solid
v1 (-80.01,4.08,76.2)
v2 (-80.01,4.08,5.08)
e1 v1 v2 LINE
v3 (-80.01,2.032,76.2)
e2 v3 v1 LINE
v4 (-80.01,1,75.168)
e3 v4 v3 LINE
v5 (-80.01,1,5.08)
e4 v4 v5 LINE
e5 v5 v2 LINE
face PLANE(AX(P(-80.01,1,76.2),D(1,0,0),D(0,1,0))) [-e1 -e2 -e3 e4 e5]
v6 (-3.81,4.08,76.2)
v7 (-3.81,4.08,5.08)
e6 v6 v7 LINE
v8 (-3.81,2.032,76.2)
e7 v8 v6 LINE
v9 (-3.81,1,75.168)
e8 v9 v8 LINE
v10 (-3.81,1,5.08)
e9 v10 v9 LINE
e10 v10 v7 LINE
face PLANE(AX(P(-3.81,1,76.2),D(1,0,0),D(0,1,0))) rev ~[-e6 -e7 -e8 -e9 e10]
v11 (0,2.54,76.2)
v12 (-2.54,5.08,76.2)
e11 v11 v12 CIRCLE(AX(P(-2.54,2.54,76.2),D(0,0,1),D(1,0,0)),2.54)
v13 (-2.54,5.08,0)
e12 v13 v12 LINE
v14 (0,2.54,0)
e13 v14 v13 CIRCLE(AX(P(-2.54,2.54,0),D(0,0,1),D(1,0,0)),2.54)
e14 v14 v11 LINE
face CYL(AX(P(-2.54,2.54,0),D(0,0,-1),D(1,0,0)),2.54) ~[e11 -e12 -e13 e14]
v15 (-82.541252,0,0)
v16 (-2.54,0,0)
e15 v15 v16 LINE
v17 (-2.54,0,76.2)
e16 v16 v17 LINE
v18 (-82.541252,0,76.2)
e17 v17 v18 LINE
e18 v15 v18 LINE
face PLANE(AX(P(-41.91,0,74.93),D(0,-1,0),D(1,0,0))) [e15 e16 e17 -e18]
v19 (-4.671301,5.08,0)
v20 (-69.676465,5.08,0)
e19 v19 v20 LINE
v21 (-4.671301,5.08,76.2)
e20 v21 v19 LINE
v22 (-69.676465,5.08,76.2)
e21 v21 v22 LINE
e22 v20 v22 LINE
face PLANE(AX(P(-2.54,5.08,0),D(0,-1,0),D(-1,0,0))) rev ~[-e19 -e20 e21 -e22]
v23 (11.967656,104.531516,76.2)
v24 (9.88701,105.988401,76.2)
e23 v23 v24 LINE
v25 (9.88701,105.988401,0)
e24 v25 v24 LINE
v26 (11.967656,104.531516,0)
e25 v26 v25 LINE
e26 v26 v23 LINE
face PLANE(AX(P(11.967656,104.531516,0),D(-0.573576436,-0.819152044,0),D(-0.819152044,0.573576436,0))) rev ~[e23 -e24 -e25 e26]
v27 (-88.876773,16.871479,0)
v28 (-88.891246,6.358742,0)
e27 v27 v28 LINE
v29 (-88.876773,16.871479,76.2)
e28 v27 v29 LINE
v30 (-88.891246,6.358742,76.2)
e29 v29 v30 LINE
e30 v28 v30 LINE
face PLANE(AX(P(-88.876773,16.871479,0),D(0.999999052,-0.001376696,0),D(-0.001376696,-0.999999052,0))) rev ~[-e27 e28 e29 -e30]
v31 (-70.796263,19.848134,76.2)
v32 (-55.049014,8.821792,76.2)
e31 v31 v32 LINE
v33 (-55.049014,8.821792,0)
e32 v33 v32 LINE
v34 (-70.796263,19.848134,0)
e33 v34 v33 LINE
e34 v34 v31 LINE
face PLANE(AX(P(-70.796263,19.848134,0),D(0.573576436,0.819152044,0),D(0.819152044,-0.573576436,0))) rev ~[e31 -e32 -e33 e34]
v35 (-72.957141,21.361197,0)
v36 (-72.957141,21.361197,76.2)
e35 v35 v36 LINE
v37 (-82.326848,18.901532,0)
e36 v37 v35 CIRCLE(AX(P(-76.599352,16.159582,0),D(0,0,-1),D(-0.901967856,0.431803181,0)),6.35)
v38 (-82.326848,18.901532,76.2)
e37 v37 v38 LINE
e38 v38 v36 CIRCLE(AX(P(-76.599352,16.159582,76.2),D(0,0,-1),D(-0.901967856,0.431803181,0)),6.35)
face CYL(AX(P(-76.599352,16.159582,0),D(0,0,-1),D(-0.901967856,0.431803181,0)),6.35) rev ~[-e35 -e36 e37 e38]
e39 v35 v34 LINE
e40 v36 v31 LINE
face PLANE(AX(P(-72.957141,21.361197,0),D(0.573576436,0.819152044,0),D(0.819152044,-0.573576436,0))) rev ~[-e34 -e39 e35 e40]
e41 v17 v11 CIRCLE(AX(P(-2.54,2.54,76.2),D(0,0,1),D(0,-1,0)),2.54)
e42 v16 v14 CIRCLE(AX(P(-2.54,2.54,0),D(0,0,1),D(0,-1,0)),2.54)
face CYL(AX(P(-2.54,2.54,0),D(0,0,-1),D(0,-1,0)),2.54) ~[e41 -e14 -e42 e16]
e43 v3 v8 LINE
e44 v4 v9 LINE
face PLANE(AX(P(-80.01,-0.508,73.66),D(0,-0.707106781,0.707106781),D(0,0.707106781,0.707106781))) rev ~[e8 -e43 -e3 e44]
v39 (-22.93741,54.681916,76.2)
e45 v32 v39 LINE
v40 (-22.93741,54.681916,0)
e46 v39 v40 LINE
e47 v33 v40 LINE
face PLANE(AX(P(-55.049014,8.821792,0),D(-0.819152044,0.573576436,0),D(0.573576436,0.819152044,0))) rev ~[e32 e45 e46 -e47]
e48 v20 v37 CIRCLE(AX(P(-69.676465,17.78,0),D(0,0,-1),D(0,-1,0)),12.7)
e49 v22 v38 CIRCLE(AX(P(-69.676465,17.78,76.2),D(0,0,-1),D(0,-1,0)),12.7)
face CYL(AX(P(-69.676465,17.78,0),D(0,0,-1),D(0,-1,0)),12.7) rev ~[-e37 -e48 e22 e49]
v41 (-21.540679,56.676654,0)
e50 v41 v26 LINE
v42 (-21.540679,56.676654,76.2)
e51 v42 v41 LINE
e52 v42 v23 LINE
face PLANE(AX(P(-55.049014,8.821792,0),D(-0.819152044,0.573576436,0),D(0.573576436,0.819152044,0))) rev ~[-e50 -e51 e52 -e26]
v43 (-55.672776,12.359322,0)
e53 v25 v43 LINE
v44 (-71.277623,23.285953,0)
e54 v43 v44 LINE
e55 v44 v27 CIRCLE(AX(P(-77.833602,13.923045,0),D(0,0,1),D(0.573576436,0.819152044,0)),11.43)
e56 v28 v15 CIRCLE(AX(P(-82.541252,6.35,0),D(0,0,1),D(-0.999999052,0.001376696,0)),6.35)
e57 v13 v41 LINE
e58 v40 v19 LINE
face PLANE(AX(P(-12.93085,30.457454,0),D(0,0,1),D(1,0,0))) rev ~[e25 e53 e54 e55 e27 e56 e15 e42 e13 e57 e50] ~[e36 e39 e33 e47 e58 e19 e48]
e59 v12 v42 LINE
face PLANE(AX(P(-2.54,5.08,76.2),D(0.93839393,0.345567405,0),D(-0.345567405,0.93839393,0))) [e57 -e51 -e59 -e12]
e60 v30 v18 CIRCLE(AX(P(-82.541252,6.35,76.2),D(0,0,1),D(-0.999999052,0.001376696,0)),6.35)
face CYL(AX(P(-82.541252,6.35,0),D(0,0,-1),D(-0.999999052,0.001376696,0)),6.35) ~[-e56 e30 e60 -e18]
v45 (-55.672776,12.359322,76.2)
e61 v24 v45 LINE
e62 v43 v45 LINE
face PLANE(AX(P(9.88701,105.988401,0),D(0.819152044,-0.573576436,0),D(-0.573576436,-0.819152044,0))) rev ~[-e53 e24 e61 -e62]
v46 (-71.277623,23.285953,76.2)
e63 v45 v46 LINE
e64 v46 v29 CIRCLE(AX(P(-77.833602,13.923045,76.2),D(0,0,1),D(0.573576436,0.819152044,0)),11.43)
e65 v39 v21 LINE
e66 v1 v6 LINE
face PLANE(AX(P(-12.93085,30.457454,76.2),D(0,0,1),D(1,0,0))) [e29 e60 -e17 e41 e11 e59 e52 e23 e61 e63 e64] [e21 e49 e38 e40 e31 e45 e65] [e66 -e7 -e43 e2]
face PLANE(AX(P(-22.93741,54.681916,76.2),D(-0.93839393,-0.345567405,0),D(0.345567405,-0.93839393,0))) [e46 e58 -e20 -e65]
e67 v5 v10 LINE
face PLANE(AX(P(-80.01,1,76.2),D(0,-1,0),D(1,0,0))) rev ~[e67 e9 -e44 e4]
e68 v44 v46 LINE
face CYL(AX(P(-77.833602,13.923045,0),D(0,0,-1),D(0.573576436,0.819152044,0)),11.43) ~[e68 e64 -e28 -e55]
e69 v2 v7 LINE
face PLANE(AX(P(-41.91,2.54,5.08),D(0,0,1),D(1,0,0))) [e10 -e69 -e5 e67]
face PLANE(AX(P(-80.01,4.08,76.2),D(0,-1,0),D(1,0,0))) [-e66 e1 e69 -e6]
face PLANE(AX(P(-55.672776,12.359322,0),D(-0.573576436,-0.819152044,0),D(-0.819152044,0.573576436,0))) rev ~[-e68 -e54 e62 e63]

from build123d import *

# Parameters (mm, degrees)
F1_DEPTH    = 76.2
F2_W        = 76.2
F2_H        = 3.08
F3_DEPTH    = 71.12
F4_W        = 76.2
F4_H        = 2.54
F5_DEPTH    = 2.032
F6_T4_DEPTH = 76.2
F8_DEPTH    = 76.2


# Not quite as in the source:
# - a fillet or chamfer that OpenCascade refuses, or shapes differently, is made with other operations: its cross-section is extruded or revolved along the edge and cut away or added


with BuildPart() as f1:
    # F0 (on Top) → F1 (new body)
    with BuildSketch(Plane.XY):
        with BuildLine():
            Line((-71.12, 0), (-2.54, 0))
            ThreePointArc((-2.54, 0), (-0.7439487758, 0.7439487758), (0, 2.54))
            ThreePointArc((0, 2.54), (-0.7439487758, 4.3360512242), (-2.54, 5.08))
            Line((-2.54, 5.08), (-69.676465438, 5.08))
            ThreePointArc((-69.676465438, 5.08), (-79.0448551931, 9.2054286756), (-82.3268475088, 18.9015317486))
            ThreePointArc((-82.3268475088, 18.9015317486), (-78.2116767293, 22.3014792843), (-72.9571412523, 21.3611970334))
            Line((-72.9571412523, 21.3611970334), (-70.7962627974, 19.8481336501))
            Line((-70.7962627974, 19.8481336501), (-55.0490144099, 8.8217916231))
            Line((-55.0490144099, 8.8217916231), (11.9676564134, 104.5315164778))
            Line((11.9676564134, 104.5315164778), (9.8870102209, 105.9884006261))
            Line((9.8870102209, 105.9884006261), (-55.672776454, 12.3593219639))
            Line((-55.672776454, 12.3593219639), (-71.2776228977, 23.2859530764))
            ThreePointArc((-71.2776228977, 23.2859530764), (-81.747690686, 24.661984001), (-88.8767730732, 16.871479209))
            Line((-88.8767730732, 16.871479209), (-88.8912459344, 6.3587420222))
            ThreePointArc((-88.8912459344, 6.3587420222), (-87.0344697211, 1.8629637755), (-82.541251952, 0))
            Line((-82.541251952, 0), (-71.12, 0))
        make_face()
    extrude(amount=F1_DEPTH)

    # F2 (on face) → F3 (cut)
    with BuildSketch(Plane.XY.offset(76.2)):
        with Locations((-41.91, 2.54)):
            Rectangle(F2_W, F2_H)
    extrude(amount=-F3_DEPTH, mode=Mode.SUBTRACT)

    # F4 (on Front) → F5 (join)
    with BuildSketch(Plane.XZ):
        with Locations((-41.91, 74.93)):
            Rectangle(F4_W, F4_H)
    extrude(amount=-F5_DEPTH)

    # F6: chamfer of 2.54 on 1 edges, made by hand


with BuildPart() as f6_tool2:
    # F6_s3 → F6_t4 (new body)
    with BuildSketch(Plane.YZ.offset(-80.01)):
        Polygon((-0.508, 73.66), (2.032, 76.2), (2.032, 73.66), align=None)
    extrude(amount=F6_T4_DEPTH)

    split(bisect_by=Plane.XZ.offset(-1), keep=Keep.BOTTOM)


with BuildPart() as f1_1:
    add(f1.part)

    # F6_t1: cut F6_tool2
    add(f6_tool2.part, mode=Mode.SUBTRACT)

    # F7 (on face) → F8 (join)
    with BuildSketch(Plane.XY.offset(76.2)):
        Polygon((-4.6713010828, 5.08), (-2.54, 5.08), (-21.5406789982, 56.6766540504), (-22.9374096266, 54.6819159876), align=None)
    extrude(amount=-F8_DEPTH)


solid = f1_1.part
